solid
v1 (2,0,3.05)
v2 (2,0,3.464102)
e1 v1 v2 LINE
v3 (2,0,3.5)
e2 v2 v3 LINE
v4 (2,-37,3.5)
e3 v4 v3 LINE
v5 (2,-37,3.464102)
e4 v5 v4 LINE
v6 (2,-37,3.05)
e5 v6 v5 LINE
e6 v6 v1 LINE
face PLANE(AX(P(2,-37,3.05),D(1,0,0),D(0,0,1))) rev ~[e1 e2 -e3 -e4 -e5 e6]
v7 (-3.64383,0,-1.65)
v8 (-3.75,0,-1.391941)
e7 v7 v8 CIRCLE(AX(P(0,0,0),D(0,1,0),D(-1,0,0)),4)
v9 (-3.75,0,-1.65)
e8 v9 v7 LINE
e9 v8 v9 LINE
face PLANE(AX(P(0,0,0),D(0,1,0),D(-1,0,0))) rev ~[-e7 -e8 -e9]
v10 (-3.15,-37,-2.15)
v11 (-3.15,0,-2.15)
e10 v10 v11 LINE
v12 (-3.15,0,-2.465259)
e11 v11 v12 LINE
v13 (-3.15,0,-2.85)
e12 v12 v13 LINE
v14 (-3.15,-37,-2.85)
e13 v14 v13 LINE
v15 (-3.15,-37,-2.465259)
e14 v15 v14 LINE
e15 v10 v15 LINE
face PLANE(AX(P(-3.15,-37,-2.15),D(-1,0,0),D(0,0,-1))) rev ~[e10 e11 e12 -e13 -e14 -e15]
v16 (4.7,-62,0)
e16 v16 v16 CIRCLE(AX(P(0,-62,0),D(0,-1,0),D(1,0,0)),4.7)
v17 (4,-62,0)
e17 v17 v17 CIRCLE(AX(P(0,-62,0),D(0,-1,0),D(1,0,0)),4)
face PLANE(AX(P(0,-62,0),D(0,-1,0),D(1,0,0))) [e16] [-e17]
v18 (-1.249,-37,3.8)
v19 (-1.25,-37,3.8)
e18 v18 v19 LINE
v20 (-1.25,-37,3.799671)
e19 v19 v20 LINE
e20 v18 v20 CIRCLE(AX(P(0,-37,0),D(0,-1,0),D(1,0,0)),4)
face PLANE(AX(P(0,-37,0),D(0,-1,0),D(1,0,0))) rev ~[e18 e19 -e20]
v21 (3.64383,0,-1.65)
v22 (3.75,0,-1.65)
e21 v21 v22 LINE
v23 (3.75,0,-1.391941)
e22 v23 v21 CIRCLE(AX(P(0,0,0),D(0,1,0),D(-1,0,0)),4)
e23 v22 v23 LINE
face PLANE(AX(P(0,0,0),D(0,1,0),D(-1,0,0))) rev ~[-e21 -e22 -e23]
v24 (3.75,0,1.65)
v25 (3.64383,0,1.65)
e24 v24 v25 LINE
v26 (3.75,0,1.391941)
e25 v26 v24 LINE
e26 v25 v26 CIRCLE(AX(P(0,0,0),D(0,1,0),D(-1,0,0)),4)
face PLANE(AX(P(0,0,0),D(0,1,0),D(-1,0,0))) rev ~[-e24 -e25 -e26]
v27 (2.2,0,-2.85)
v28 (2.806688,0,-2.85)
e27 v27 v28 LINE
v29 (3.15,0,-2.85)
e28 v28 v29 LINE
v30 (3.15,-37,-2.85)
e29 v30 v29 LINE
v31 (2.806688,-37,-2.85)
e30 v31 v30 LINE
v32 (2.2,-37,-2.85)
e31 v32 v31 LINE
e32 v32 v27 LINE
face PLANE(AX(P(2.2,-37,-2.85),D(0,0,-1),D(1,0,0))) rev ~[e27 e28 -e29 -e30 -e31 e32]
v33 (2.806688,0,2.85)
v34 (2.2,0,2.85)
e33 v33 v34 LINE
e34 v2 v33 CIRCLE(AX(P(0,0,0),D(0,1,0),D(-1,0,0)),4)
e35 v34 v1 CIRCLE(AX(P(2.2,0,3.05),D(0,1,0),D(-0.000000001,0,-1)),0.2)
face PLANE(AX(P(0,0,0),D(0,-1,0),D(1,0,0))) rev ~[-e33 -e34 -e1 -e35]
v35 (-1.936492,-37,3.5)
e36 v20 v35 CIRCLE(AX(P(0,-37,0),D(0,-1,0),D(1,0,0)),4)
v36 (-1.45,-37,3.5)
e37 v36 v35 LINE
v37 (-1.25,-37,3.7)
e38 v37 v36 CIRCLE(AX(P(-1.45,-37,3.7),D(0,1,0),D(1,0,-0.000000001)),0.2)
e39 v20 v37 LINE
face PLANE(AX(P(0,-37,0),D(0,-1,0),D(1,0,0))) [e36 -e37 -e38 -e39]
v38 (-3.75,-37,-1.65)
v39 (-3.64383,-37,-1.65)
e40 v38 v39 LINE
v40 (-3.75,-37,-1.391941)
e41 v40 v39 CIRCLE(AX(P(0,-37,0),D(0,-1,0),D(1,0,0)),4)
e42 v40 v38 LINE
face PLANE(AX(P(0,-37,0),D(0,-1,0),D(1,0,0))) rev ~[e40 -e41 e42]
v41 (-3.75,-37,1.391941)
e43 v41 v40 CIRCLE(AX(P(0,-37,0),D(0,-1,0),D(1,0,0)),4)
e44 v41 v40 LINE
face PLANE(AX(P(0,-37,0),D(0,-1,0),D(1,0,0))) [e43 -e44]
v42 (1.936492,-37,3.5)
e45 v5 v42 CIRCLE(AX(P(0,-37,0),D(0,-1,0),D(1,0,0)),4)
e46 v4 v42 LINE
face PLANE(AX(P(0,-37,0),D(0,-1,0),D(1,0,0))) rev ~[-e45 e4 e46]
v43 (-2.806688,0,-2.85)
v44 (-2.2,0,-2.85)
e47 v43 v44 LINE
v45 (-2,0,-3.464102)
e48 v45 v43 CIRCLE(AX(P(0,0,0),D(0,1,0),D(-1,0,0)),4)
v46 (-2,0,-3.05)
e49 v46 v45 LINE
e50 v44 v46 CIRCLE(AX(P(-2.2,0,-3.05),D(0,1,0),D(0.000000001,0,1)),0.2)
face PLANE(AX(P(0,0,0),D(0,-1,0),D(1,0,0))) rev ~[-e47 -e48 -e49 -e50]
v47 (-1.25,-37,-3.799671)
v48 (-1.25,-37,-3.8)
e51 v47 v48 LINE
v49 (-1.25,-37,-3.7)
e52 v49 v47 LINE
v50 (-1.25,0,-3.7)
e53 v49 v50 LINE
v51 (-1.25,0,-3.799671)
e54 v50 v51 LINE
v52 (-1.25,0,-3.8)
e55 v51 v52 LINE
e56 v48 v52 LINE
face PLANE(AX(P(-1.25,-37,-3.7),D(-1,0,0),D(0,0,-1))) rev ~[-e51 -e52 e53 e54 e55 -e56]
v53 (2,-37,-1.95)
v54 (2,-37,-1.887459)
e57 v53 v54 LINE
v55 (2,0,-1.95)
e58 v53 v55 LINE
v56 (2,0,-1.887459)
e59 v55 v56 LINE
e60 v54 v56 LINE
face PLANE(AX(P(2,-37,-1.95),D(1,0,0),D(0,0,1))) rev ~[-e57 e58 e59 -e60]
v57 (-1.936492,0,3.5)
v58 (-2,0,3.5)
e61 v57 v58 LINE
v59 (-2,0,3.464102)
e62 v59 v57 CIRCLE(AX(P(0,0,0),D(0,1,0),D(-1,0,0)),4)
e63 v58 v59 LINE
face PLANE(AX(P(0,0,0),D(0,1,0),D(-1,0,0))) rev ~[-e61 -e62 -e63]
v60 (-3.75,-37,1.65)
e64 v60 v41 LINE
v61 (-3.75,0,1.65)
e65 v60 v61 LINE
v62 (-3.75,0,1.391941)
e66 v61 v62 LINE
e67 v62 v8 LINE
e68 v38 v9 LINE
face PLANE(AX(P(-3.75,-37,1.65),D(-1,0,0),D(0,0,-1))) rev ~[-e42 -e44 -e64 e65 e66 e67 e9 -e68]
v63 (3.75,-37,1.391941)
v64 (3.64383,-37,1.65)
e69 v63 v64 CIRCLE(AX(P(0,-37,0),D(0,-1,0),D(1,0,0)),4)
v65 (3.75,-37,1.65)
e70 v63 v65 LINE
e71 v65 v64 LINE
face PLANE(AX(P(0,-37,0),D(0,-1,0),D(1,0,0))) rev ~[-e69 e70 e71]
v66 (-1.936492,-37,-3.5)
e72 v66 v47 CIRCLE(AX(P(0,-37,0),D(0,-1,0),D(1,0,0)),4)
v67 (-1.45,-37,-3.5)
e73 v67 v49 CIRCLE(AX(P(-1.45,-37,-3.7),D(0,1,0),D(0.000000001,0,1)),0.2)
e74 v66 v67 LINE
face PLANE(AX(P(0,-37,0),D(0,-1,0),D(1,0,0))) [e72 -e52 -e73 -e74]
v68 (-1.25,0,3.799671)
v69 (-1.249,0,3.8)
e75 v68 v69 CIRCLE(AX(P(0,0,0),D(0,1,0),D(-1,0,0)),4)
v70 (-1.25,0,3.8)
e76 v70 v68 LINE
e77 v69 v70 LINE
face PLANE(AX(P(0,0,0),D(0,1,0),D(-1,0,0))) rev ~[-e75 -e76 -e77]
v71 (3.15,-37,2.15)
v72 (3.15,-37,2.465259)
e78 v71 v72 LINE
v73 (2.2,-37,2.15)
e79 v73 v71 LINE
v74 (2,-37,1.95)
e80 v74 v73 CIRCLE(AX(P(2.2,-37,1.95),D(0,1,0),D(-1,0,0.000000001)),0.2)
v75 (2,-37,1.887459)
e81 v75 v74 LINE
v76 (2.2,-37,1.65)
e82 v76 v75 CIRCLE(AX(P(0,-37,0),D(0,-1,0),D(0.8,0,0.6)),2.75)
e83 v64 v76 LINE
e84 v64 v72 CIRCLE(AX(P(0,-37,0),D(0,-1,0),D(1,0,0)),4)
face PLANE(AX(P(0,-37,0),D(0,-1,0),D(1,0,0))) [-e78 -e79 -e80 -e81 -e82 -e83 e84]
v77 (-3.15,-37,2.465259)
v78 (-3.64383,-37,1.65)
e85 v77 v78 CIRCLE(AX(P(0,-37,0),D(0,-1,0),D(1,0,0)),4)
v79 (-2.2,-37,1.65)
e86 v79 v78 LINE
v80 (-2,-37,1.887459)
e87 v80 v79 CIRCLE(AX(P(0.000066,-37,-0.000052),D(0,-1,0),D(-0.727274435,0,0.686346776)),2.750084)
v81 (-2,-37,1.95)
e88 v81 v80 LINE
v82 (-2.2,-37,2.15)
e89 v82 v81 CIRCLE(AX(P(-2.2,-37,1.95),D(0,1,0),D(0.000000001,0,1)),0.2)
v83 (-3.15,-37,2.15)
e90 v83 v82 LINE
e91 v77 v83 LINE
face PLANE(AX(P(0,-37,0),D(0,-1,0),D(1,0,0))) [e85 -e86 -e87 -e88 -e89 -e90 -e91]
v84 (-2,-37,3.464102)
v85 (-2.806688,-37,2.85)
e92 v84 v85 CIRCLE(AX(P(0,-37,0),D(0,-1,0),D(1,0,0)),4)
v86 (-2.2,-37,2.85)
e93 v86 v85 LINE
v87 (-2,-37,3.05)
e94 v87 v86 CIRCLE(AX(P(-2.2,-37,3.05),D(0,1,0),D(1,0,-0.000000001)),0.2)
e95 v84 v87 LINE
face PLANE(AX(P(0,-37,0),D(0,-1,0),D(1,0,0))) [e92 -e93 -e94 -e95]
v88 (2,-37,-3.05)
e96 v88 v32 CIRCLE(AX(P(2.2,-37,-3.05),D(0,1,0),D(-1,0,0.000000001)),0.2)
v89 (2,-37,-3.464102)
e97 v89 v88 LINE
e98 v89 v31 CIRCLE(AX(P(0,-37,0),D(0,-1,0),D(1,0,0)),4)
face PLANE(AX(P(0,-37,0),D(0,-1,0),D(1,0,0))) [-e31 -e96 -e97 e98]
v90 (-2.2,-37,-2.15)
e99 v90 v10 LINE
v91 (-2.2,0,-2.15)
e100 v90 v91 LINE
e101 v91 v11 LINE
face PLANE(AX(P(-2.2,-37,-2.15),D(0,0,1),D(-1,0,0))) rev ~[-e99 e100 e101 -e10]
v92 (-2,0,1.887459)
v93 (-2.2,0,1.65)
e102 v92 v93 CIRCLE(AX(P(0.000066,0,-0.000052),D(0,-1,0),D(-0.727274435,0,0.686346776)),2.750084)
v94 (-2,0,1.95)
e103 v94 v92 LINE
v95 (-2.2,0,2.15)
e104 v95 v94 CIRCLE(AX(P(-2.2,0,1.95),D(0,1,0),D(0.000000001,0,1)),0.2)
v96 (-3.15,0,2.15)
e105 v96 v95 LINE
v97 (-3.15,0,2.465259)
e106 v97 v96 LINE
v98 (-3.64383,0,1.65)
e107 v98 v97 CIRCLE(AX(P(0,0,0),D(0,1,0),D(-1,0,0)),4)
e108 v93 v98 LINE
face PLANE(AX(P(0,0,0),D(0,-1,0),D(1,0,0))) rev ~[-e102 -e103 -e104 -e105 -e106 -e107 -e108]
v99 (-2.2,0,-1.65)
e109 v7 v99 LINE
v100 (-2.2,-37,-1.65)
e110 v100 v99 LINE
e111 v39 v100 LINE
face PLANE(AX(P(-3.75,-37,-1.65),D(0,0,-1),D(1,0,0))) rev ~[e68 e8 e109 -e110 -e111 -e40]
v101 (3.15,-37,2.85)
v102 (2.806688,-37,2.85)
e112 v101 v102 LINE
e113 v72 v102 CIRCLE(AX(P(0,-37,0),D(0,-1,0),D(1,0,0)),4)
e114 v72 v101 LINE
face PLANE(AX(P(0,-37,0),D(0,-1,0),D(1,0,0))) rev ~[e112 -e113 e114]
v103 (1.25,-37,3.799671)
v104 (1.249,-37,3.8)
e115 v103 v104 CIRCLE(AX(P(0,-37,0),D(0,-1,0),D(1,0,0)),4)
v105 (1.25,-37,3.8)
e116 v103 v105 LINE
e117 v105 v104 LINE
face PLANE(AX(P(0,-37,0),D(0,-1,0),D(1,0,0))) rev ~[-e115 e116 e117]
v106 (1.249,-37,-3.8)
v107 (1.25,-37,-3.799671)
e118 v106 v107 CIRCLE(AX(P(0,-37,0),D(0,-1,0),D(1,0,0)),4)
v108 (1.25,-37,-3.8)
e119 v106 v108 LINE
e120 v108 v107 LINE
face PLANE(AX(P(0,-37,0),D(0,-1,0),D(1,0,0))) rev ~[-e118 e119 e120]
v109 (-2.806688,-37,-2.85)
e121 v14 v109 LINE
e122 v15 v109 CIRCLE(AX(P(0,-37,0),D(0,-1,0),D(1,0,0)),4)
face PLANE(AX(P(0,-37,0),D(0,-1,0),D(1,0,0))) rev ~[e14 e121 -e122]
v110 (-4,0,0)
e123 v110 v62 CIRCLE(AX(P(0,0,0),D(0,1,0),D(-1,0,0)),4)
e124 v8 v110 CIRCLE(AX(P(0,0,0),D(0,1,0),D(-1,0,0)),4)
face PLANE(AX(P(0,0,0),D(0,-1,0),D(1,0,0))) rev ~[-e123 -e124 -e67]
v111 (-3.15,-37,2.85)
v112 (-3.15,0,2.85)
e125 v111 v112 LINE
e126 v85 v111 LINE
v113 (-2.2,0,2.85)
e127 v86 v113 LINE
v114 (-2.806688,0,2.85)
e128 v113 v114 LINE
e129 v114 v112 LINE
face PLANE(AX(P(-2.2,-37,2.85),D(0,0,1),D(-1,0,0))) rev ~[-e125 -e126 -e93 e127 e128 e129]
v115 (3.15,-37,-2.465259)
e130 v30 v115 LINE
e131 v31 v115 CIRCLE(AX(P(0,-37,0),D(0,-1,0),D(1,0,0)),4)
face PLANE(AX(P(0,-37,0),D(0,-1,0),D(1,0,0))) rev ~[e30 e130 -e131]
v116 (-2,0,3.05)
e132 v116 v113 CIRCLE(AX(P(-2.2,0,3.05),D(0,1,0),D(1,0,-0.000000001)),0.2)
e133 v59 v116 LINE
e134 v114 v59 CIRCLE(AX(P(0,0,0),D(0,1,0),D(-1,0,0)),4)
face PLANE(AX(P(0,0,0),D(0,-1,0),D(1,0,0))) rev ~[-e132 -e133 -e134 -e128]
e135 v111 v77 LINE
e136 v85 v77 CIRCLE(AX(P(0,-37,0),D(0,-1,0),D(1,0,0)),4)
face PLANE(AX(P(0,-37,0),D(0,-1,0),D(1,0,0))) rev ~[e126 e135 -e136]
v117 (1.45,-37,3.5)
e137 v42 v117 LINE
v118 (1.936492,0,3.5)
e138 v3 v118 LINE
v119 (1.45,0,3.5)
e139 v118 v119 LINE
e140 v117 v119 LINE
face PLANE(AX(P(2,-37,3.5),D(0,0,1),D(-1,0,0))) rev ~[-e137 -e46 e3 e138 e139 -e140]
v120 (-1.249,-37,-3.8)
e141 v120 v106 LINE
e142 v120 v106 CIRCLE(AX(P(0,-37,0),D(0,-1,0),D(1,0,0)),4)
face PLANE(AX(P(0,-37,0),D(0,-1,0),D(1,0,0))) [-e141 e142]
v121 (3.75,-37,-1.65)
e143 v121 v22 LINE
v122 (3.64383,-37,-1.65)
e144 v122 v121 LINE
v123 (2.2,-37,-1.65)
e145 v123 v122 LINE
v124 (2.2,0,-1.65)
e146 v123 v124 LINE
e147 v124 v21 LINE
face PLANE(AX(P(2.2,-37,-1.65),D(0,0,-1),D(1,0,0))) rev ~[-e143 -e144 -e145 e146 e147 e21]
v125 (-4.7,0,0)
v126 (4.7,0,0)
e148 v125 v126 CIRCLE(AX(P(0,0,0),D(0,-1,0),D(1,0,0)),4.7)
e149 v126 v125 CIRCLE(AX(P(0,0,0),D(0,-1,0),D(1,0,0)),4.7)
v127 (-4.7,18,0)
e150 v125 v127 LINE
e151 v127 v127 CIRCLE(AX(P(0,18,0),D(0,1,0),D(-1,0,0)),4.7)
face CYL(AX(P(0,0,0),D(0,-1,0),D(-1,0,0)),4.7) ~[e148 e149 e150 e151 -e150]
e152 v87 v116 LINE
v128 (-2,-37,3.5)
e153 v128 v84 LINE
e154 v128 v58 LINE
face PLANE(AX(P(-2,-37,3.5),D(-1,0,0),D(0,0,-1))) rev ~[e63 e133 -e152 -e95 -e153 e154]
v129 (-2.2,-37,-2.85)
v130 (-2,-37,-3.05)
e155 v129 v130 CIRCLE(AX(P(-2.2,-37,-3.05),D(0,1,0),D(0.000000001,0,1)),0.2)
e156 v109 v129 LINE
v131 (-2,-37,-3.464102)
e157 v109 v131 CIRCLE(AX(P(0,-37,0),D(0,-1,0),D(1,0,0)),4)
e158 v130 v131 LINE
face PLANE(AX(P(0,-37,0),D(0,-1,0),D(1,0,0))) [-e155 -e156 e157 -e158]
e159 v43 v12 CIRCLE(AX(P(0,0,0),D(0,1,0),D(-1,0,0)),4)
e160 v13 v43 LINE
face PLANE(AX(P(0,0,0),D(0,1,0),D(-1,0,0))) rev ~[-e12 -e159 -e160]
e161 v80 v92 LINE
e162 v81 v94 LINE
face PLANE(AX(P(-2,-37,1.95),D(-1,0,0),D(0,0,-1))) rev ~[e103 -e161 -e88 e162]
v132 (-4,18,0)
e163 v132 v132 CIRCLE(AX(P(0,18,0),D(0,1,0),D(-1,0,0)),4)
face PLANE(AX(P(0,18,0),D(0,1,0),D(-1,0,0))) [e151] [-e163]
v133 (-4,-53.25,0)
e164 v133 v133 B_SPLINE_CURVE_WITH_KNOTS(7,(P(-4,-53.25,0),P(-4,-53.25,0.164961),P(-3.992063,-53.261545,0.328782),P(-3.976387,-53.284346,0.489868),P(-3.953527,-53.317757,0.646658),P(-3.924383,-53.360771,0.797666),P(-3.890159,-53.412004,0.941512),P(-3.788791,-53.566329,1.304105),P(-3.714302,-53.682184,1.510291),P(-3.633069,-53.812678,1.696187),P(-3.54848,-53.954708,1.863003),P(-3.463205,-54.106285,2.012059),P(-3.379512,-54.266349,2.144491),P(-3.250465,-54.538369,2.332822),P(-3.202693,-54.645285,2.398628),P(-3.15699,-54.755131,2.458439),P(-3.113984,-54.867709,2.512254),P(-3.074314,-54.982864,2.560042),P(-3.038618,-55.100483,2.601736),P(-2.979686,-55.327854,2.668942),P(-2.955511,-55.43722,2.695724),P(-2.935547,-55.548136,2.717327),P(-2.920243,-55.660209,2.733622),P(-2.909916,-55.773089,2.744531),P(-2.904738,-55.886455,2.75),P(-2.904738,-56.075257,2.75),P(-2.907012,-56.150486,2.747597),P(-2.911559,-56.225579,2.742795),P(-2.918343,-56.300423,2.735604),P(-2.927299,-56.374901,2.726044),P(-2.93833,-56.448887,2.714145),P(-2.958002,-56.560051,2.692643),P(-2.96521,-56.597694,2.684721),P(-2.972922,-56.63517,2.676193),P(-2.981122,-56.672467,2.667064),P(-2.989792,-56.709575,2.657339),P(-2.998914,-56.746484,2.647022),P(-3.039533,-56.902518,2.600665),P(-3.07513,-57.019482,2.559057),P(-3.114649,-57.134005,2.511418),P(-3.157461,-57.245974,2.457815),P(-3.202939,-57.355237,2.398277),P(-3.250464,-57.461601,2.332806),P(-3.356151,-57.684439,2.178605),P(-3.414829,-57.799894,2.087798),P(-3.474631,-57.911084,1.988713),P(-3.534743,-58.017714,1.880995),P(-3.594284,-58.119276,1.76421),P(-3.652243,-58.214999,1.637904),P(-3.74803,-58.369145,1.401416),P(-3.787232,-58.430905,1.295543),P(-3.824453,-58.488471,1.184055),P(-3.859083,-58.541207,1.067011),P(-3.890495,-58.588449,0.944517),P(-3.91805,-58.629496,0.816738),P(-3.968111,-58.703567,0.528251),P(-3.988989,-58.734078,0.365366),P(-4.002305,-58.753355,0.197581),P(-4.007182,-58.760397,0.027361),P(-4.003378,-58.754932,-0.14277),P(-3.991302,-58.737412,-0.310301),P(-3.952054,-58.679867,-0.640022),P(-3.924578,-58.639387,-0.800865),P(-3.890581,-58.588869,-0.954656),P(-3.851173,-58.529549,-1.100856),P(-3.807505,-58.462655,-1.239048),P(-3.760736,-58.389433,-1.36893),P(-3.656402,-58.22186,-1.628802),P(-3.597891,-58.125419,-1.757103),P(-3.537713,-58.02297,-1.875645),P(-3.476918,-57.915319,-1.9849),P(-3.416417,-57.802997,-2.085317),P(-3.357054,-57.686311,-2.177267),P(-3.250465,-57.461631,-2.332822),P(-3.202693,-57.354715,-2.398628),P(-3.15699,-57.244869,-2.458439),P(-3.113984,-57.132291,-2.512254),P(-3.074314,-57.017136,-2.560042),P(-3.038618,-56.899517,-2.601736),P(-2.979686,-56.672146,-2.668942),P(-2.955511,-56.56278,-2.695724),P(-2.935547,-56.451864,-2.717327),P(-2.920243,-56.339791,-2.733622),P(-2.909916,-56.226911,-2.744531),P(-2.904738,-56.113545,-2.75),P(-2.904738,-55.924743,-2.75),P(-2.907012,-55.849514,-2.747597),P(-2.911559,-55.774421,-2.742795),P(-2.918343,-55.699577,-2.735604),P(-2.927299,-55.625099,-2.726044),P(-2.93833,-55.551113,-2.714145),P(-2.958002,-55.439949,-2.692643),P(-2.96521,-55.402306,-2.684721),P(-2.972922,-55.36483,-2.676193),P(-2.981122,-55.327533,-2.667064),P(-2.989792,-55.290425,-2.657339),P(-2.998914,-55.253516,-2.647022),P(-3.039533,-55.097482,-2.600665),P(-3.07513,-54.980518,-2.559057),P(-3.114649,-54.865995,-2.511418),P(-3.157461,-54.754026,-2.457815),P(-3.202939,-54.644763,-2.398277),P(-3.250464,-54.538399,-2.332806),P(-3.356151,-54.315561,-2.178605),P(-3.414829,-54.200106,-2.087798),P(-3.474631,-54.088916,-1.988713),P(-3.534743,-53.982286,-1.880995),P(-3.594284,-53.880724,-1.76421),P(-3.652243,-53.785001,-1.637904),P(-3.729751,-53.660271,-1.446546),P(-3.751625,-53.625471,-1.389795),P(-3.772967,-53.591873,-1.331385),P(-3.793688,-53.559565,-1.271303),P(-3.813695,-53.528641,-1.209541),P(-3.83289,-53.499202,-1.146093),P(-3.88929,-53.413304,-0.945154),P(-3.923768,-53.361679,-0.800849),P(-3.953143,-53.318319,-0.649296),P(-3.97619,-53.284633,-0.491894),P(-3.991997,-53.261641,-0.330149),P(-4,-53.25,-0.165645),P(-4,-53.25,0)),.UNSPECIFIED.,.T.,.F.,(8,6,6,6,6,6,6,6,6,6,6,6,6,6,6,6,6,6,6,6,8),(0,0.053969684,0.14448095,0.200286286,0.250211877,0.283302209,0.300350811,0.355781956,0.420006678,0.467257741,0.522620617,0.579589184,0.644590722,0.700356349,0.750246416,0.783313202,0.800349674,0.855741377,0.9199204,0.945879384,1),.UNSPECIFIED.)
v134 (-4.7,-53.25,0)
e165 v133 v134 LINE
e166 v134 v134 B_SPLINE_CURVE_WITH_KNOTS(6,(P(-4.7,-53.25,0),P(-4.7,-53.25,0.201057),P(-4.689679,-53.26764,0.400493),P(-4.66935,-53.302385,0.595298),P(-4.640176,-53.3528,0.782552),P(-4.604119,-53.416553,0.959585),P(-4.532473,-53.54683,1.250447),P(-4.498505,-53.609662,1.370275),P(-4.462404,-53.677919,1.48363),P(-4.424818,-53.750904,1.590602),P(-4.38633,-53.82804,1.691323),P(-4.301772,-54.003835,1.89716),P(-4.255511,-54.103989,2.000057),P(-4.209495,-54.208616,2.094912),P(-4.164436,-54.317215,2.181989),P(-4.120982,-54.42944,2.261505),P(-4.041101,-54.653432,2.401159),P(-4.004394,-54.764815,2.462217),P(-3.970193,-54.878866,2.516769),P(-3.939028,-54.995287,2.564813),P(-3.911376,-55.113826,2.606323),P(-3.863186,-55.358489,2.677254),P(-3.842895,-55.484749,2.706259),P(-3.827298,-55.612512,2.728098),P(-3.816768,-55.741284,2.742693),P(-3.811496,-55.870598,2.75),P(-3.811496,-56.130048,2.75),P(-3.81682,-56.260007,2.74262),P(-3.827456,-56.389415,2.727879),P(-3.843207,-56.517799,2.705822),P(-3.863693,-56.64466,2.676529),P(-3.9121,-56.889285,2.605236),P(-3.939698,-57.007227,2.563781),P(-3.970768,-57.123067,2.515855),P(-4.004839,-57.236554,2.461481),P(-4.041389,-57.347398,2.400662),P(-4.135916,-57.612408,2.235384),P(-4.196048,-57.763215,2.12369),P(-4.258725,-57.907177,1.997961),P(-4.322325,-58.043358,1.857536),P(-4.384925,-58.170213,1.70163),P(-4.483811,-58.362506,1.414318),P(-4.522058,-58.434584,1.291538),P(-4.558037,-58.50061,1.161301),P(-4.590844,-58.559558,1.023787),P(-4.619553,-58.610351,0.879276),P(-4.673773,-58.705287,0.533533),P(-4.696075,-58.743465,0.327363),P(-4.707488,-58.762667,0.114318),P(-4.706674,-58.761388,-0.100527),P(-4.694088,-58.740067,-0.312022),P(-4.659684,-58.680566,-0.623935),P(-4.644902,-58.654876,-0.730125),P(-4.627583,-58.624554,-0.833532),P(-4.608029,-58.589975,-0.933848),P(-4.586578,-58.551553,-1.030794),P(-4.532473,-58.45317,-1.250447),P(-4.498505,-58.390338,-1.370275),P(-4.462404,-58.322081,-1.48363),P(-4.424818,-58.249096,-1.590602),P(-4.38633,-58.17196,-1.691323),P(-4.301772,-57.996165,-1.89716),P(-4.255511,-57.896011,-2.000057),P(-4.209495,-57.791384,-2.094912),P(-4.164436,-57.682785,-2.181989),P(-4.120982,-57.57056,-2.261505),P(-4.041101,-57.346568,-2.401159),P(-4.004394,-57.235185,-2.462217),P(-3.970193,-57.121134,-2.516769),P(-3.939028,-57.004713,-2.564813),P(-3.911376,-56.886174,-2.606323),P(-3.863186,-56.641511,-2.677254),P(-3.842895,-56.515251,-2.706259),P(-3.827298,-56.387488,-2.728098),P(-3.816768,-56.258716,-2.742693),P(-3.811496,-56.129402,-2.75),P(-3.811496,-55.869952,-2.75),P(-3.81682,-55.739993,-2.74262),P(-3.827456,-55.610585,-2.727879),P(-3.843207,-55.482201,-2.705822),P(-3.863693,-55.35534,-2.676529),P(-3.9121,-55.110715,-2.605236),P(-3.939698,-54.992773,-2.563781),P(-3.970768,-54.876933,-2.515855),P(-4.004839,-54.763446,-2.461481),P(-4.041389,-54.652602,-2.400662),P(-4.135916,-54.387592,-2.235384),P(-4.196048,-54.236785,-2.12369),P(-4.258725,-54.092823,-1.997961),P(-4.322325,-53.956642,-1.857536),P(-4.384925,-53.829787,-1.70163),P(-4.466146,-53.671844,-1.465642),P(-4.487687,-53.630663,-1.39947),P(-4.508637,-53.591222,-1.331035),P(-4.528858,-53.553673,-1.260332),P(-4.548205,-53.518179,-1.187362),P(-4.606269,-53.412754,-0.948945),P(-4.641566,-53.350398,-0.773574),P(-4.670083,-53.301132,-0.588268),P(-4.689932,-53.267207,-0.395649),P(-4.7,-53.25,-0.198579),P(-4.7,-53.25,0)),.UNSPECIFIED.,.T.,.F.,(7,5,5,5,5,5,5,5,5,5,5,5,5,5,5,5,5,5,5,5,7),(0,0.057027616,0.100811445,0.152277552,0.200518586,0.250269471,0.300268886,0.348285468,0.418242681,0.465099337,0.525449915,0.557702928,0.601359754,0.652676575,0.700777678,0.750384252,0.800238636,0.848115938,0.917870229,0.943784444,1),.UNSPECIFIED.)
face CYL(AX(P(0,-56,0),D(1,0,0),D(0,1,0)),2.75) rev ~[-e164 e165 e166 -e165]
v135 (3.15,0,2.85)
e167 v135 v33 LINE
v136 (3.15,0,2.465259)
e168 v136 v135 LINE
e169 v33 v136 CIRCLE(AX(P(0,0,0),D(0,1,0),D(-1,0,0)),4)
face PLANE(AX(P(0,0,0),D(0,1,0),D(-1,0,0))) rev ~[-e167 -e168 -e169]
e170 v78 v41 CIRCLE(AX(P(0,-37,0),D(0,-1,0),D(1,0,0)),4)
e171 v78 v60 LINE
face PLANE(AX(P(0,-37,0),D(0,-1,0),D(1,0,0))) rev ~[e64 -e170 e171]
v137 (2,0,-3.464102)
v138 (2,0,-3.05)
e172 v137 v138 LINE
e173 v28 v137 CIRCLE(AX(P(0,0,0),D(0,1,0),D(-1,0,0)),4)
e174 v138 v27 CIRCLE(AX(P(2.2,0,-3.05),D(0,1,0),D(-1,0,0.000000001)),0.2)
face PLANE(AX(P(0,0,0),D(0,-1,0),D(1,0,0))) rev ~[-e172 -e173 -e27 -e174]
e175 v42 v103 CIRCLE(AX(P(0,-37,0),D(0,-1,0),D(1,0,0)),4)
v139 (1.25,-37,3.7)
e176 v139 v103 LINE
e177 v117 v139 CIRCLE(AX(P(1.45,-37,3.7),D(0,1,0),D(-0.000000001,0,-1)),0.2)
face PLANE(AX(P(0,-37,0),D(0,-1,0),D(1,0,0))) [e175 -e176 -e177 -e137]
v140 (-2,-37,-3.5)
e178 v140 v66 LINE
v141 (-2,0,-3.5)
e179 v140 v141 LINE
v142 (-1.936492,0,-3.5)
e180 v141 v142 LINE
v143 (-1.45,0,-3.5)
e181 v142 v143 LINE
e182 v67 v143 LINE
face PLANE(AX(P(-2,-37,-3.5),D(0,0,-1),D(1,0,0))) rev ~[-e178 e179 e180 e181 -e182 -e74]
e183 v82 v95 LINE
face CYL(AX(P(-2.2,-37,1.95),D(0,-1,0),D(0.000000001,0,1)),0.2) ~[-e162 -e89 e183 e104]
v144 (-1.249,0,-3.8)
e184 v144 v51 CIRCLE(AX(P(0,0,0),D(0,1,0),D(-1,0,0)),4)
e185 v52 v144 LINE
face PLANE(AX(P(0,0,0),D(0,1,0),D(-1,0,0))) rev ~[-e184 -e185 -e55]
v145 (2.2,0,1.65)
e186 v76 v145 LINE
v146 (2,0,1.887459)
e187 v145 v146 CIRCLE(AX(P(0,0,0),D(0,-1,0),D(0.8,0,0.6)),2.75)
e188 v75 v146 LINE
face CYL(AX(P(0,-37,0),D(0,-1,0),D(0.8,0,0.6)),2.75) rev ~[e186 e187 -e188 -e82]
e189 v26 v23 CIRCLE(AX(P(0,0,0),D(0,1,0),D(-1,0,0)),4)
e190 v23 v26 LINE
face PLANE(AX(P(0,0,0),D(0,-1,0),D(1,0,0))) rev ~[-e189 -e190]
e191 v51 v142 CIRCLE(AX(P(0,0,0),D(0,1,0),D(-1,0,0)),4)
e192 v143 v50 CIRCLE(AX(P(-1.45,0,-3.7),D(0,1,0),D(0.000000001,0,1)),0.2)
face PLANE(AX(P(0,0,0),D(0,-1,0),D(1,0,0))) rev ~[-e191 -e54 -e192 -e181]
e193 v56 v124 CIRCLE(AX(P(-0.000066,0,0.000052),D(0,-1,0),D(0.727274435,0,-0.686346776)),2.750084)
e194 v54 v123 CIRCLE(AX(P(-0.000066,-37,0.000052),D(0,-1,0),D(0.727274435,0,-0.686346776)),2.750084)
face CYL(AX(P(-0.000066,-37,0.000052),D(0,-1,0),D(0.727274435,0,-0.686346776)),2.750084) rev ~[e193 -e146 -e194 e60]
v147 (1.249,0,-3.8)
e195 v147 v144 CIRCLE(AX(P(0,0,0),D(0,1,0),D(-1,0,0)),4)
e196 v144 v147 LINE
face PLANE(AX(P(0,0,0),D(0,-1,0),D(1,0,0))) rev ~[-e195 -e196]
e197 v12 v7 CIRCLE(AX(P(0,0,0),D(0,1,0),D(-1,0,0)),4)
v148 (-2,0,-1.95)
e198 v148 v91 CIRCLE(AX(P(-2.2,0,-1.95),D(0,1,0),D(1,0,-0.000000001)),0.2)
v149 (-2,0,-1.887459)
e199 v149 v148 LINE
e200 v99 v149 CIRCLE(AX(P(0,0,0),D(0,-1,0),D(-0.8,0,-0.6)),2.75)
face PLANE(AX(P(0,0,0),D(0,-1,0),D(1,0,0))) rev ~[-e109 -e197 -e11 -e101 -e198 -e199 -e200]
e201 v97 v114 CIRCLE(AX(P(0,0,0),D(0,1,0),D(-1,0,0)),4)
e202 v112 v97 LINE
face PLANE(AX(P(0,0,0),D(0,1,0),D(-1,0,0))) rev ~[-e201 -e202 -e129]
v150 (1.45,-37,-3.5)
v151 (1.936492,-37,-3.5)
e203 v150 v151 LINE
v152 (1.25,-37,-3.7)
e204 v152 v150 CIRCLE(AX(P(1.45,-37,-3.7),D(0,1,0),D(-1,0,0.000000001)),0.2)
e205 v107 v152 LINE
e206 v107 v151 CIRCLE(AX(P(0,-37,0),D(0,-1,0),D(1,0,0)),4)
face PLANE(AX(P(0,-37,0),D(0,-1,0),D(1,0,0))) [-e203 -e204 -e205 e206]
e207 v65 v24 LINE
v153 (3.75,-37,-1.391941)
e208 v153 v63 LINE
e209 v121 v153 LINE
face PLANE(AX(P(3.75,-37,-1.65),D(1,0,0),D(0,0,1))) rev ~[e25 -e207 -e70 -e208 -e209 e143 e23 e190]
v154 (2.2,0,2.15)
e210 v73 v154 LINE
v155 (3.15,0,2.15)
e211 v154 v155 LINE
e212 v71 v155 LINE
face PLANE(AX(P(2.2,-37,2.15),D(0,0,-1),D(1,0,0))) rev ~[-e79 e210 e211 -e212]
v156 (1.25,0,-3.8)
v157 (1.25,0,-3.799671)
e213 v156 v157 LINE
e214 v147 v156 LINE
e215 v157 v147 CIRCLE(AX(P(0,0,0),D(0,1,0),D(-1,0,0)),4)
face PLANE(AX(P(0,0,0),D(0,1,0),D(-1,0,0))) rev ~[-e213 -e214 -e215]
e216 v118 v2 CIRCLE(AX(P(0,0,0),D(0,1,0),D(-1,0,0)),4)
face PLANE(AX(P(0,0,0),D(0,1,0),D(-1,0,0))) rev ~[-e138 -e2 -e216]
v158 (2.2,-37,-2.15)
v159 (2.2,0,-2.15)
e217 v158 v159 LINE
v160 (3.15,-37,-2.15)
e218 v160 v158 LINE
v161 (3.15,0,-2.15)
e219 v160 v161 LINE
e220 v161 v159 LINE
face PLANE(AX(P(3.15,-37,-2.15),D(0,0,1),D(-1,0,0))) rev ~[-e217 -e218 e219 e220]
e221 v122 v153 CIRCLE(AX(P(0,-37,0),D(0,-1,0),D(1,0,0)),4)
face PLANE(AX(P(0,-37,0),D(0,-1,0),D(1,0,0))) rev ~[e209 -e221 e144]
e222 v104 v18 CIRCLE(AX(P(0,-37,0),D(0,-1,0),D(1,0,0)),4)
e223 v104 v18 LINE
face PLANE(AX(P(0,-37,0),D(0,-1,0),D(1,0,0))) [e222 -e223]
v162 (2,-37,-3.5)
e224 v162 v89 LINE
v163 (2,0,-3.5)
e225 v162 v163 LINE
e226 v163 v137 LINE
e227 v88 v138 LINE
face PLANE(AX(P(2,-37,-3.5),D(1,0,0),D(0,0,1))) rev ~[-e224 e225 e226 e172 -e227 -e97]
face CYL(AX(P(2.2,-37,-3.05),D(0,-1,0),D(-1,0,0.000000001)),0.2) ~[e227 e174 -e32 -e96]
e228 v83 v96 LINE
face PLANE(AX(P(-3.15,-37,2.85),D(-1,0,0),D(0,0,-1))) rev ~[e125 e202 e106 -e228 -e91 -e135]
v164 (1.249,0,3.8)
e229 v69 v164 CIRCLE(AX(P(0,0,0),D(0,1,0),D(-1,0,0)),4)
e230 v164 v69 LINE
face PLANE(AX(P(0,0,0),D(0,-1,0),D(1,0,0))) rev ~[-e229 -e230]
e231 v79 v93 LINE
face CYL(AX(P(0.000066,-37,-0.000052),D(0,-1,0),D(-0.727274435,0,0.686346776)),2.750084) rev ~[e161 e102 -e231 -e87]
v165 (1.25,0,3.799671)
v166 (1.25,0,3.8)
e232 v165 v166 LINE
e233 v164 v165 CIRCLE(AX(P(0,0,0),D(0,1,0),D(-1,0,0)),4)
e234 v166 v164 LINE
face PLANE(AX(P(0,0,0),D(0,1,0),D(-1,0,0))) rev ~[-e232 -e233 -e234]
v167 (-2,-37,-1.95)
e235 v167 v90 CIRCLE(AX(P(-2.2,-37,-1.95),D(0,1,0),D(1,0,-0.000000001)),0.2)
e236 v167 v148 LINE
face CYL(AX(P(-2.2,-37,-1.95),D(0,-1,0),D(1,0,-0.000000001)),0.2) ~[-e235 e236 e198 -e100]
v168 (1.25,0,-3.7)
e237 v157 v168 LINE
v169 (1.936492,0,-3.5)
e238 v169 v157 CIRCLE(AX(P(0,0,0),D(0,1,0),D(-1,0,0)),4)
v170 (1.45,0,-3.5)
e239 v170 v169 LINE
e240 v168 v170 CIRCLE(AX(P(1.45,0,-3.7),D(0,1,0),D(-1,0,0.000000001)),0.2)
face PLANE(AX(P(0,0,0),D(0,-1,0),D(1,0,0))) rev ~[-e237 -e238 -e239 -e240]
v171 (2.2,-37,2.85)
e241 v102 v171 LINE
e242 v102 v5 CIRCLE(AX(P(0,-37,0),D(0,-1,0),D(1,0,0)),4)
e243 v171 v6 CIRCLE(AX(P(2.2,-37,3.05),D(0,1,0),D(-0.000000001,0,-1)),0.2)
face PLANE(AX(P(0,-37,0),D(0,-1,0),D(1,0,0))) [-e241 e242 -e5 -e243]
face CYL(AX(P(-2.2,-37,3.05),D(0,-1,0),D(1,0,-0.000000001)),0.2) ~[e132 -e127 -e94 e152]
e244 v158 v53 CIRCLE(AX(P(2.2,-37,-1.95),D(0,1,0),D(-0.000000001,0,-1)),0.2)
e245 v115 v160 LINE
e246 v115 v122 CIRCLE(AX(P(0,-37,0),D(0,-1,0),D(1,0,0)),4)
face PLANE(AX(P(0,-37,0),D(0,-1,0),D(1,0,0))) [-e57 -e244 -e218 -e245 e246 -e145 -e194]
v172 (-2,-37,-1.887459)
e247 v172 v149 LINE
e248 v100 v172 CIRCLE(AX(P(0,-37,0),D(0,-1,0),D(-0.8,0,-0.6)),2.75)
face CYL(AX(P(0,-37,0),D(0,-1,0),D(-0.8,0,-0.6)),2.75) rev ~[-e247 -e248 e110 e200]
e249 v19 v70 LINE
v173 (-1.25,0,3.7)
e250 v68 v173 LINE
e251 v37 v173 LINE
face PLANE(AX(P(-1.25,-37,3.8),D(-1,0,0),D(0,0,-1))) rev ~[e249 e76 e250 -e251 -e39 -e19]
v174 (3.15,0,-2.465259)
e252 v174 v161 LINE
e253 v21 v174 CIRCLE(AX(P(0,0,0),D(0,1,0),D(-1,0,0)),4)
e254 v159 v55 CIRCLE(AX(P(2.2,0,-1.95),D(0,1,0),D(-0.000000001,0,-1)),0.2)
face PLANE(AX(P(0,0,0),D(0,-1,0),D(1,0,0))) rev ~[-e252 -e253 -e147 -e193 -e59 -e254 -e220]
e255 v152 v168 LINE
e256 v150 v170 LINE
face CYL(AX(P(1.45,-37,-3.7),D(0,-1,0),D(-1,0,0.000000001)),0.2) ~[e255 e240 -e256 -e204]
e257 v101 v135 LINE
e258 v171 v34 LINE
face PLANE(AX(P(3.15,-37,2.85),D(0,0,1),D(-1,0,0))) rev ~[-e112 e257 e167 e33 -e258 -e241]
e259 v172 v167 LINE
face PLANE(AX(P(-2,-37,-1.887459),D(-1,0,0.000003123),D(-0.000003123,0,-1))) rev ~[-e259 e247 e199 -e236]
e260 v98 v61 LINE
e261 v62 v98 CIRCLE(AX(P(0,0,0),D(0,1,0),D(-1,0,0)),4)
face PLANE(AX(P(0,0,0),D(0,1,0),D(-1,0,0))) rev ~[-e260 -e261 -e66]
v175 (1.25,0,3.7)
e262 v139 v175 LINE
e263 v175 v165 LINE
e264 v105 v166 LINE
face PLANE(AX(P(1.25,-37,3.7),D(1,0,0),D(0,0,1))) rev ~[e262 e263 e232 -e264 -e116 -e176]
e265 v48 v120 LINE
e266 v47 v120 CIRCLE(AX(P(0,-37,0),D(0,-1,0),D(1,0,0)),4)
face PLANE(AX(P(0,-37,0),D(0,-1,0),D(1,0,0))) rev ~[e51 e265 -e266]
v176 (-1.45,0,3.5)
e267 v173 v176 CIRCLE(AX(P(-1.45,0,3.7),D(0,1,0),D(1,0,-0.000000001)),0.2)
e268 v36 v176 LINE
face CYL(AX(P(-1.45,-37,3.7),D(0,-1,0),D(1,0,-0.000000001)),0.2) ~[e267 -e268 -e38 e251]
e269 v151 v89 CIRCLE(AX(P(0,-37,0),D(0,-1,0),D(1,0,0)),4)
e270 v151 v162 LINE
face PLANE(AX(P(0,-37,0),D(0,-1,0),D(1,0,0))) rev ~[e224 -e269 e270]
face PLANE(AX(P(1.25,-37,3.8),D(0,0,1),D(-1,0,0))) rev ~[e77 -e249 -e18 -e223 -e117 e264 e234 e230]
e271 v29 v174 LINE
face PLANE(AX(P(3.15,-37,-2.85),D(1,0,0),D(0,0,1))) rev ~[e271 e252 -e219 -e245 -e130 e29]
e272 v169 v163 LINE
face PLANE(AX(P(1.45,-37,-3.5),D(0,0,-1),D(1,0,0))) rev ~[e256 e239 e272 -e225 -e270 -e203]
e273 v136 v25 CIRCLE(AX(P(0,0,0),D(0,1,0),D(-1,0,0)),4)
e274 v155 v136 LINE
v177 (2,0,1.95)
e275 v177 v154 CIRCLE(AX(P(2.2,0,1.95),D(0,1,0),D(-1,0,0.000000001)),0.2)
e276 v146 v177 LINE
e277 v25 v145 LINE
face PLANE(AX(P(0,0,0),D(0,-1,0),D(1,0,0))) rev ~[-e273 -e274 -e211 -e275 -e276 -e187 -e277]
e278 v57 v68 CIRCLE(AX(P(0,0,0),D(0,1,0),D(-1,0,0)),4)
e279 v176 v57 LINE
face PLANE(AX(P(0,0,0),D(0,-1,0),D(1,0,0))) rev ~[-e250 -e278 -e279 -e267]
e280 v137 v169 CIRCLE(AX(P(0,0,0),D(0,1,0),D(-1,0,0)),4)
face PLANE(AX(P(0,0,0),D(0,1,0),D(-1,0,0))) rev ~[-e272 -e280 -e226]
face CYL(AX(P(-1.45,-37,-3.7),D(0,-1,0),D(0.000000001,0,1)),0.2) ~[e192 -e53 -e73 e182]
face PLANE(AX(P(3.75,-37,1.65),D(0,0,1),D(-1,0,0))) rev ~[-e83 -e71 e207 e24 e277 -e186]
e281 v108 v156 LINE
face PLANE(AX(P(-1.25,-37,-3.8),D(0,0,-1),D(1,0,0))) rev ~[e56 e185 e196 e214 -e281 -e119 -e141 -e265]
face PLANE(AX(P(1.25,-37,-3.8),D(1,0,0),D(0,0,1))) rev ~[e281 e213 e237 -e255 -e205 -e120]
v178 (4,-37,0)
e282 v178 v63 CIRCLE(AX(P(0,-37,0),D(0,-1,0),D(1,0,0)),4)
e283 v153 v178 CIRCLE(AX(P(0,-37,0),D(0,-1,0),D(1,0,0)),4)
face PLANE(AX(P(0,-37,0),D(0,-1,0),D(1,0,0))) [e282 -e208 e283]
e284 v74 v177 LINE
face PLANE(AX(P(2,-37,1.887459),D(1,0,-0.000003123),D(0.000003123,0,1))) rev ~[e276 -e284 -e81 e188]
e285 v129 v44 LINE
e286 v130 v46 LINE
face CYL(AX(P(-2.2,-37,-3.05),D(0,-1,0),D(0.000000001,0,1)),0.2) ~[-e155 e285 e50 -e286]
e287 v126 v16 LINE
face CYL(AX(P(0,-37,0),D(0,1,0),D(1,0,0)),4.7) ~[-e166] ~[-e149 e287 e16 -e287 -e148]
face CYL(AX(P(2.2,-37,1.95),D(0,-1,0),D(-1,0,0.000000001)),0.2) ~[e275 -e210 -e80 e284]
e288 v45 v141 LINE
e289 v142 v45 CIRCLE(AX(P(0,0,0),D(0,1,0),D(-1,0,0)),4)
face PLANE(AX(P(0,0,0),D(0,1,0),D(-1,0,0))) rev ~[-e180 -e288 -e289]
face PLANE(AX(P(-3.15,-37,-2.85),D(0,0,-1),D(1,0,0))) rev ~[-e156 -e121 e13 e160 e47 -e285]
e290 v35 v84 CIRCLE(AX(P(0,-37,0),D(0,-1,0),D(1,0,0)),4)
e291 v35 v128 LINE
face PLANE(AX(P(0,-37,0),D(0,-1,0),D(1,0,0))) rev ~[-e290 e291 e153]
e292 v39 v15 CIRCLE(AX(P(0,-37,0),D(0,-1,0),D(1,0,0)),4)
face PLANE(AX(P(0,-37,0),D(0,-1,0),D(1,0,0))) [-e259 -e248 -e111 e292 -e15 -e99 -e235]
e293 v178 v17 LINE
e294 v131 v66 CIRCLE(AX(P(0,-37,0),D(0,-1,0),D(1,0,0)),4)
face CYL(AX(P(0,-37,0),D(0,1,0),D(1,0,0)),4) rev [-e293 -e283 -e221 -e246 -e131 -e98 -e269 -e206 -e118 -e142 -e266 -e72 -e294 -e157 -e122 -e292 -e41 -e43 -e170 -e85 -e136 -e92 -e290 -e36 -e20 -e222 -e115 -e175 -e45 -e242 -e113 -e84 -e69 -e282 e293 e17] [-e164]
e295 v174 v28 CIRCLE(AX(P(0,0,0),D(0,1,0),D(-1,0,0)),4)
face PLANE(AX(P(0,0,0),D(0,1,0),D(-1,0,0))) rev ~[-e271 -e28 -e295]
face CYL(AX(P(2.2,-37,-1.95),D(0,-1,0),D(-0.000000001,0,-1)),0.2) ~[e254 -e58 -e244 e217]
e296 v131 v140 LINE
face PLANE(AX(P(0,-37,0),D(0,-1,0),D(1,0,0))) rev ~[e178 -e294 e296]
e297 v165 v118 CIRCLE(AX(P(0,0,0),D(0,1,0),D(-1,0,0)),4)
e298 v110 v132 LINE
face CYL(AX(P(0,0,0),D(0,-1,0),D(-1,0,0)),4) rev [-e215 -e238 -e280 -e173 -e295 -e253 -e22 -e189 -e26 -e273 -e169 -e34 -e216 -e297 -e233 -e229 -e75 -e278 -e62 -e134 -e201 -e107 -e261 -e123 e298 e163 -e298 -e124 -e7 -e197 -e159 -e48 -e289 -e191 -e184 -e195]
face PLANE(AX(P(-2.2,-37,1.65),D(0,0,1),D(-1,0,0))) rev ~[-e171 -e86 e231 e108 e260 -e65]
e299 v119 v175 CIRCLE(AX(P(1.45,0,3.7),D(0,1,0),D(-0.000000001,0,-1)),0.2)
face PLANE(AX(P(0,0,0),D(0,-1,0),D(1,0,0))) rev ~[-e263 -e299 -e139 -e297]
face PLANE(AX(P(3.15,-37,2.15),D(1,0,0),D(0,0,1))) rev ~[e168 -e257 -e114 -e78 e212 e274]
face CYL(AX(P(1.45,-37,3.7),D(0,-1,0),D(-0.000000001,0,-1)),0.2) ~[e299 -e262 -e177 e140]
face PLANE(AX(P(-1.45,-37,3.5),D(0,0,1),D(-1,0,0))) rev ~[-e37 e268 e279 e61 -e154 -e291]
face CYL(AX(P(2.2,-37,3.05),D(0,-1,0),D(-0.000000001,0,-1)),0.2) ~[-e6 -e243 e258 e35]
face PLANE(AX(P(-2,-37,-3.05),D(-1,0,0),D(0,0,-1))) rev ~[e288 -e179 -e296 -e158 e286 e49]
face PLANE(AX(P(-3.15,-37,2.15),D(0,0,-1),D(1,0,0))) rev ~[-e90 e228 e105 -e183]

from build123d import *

# Parameters (mm, degrees)
F3_R      = 4.7
F4_DEPTH  = 37
F8_DEPTH  = 37
F6_R      = 4.7
F6_R_2    = 4
F9_DEPTH  = 25
F7_R      = 4.7
F7_R_2    = 4
F10_DEPTH = 18
F11_R     = 2.75
F12_DEPTH = 4.701


# Not quite as in the source:
# - ends of sketch curves that miss each other by under 0.0002 mm in the source are joined


with BuildPart() as f4:
    # F3 (on Front) → F4 (new body)
    with BuildSketch(Plane.XZ):
        Circle(F3_R)
    extrude(amount=F4_DEPTH)

    # F5 (on face) → F8 (cut, through all)
    with BuildSketch(Plane.XZ.offset(37)):
        with BuildLine():
            Line((-1.25, -3.8), (0, -3.8))
            Line((0, -3.8), (1.25, -3.8))
            Line((1.25, -3.8), (1.25, -3.7))
            ThreePointArc((1.25, -3.7), (1.3085786438, -3.5585786438), (1.45, -3.5))
            Line((1.45, -3.5), (2, -3.5))
            Line((2, -3.5), (2, -3.05))
            ThreePointArc((2, -3.05), (2.0585786438, -2.9085786438), (2.2, -2.85))
            Line((2.2, -2.85), (3.15, -2.85))
            Line((3.15, -2.85), (3.15, -2.15))
            Line((3.15, -2.15), (2.2, -2.15))
            ThreePointArc((2.2, -2.15), (2.0585786438, -2.0914213562), (2, -1.95))
            Line((2, -1.95), (2, -1.887459))
            ThreePointArc((2, -1.887459), (2.1033535752, -1.771554046), (2.2, -1.65))
            Line((2.2, -1.65), (3.75, -1.65))
            Line((3.75, -1.65), (3.75, 0))
            Line((3.75, 0), (3.75, 1.65))
            Line((3.75, 1.65), (2.2, 1.65))
            ThreePointArc((2.2, 1.65), (2.1033535752, 1.771554046), (1.9999998047, 1.8874588157))
            Line((1.9999998047, 1.8874588157), (2, 1.95))
            ThreePointArc((2, 1.95), (2.0585786438, 2.0914213562), (2.2, 2.15))
            Line((2.2, 2.15), (3.15, 2.15))
            Line((3.15, 2.15), (3.15, 2.85))
            Line((3.15, 2.85), (2.2, 2.85))
            ThreePointArc((2.2, 2.85), (2.0585786438, 2.9085786438), (2, 3.05))
            Line((2, 3.05), (2, 3.5))
            Line((2, 3.5), (1.45, 3.5))
            ThreePointArc((1.45, 3.5), (1.3085786438, 3.5585786438), (1.25, 3.7))
            Line((1.25, 3.7), (1.25, 3.8))
            Line((1.25, 3.8), (0, 3.8))
            Line((0, 3.8), (-1.25, 3.8))
            Line((-1.25, 3.8), (-1.25, 3.7))
            ThreePointArc((-1.25, 3.7), (-1.3085786438, 3.5585786438), (-1.45, 3.5))
            Line((-1.45, 3.5), (-2, 3.5))
            Line((-2, 3.5), (-2, 3.05))
            ThreePointArc((-2, 3.05), (-2.0585786438, 2.9085786438), (-2.2, 2.85))
            Line((-2.2, 2.85), (-3.15, 2.85))
            Line((-3.15, 2.85), (-3.15, 2.15))
            Line((-3.15, 2.15), (-2.2, 2.15))
            ThreePointArc((-2.2, 2.15), (-2.0585786438, 2.0914213562), (-2, 1.95))
            Line((-2, 1.95), (-2, 1.887459))
            ThreePointArc((-2, 1.887459), (-2.1033535752, 1.771554046), (-2.2, 1.65))
            Line((-2.2, 1.65), (-3.75, 1.65))
            Line((-3.75, 1.65), (-3.75, 0))
            Line((-3.75, 0), (-3.75, -1.65))
            Line((-3.75, -1.65), (-2.2, -1.65))
            ThreePointArc((-2.2, -1.65), (-2.1033535752, -1.771554046), (-1.9999998047, -1.8874588157))
            Line((-1.9999998047, -1.8874588157), (-2, -1.95))
            ThreePointArc((-2, -1.95), (-2.0585786438, -2.0914213562), (-2.2, -2.15))
            Line((-2.2, -2.15), (-3.15, -2.15))
            Line((-3.15, -2.15), (-3.15, -2.85))
            Line((-3.15, -2.85), (-2.2, -2.85))
            ThreePointArc((-2.2, -2.85), (-2.0585786438, -2.9085786438), (-2, -3.05))
            Line((-2, -3.05), (-2, -3.5))
            Line((-2, -3.5), (-1.45, -3.5))
            ThreePointArc((-1.45, -3.5), (-1.3085786438, -3.5585786438), (-1.25, -3.7))
            Line((-1.25, -3.7), (-1.25, -3.8))
        make_face()
    extrude(amount=-F8_DEPTH, mode=Mode.SUBTRACT)

    # F6 (on face) → F9 (join)
    with BuildSketch(Plane.XZ.offset(37)):
        Circle(F6_R)
        Circle(F6_R_2, mode=Mode.SUBTRACT)
    extrude(amount=F9_DEPTH)

    # F7 (on face) → F10 (join)
    with BuildSketch(Plane(origin=(0, 0, 0), x_dir=(-1, 0, 0), z_dir=(0, 1, 0))):
        Circle(F7_R)
        Circle(F7_R_2, mode=Mode.SUBTRACT)
    extrude(amount=F10_DEPTH)

    # F11 (on Right) → F12 (cut, through all)
    with BuildSketch(Plane.YZ):
        with Locations((-56, 0)):
            Circle(F11_R)
    extrude(amount=-F12_DEPTH, mode=Mode.SUBTRACT)


solid = f4.part
